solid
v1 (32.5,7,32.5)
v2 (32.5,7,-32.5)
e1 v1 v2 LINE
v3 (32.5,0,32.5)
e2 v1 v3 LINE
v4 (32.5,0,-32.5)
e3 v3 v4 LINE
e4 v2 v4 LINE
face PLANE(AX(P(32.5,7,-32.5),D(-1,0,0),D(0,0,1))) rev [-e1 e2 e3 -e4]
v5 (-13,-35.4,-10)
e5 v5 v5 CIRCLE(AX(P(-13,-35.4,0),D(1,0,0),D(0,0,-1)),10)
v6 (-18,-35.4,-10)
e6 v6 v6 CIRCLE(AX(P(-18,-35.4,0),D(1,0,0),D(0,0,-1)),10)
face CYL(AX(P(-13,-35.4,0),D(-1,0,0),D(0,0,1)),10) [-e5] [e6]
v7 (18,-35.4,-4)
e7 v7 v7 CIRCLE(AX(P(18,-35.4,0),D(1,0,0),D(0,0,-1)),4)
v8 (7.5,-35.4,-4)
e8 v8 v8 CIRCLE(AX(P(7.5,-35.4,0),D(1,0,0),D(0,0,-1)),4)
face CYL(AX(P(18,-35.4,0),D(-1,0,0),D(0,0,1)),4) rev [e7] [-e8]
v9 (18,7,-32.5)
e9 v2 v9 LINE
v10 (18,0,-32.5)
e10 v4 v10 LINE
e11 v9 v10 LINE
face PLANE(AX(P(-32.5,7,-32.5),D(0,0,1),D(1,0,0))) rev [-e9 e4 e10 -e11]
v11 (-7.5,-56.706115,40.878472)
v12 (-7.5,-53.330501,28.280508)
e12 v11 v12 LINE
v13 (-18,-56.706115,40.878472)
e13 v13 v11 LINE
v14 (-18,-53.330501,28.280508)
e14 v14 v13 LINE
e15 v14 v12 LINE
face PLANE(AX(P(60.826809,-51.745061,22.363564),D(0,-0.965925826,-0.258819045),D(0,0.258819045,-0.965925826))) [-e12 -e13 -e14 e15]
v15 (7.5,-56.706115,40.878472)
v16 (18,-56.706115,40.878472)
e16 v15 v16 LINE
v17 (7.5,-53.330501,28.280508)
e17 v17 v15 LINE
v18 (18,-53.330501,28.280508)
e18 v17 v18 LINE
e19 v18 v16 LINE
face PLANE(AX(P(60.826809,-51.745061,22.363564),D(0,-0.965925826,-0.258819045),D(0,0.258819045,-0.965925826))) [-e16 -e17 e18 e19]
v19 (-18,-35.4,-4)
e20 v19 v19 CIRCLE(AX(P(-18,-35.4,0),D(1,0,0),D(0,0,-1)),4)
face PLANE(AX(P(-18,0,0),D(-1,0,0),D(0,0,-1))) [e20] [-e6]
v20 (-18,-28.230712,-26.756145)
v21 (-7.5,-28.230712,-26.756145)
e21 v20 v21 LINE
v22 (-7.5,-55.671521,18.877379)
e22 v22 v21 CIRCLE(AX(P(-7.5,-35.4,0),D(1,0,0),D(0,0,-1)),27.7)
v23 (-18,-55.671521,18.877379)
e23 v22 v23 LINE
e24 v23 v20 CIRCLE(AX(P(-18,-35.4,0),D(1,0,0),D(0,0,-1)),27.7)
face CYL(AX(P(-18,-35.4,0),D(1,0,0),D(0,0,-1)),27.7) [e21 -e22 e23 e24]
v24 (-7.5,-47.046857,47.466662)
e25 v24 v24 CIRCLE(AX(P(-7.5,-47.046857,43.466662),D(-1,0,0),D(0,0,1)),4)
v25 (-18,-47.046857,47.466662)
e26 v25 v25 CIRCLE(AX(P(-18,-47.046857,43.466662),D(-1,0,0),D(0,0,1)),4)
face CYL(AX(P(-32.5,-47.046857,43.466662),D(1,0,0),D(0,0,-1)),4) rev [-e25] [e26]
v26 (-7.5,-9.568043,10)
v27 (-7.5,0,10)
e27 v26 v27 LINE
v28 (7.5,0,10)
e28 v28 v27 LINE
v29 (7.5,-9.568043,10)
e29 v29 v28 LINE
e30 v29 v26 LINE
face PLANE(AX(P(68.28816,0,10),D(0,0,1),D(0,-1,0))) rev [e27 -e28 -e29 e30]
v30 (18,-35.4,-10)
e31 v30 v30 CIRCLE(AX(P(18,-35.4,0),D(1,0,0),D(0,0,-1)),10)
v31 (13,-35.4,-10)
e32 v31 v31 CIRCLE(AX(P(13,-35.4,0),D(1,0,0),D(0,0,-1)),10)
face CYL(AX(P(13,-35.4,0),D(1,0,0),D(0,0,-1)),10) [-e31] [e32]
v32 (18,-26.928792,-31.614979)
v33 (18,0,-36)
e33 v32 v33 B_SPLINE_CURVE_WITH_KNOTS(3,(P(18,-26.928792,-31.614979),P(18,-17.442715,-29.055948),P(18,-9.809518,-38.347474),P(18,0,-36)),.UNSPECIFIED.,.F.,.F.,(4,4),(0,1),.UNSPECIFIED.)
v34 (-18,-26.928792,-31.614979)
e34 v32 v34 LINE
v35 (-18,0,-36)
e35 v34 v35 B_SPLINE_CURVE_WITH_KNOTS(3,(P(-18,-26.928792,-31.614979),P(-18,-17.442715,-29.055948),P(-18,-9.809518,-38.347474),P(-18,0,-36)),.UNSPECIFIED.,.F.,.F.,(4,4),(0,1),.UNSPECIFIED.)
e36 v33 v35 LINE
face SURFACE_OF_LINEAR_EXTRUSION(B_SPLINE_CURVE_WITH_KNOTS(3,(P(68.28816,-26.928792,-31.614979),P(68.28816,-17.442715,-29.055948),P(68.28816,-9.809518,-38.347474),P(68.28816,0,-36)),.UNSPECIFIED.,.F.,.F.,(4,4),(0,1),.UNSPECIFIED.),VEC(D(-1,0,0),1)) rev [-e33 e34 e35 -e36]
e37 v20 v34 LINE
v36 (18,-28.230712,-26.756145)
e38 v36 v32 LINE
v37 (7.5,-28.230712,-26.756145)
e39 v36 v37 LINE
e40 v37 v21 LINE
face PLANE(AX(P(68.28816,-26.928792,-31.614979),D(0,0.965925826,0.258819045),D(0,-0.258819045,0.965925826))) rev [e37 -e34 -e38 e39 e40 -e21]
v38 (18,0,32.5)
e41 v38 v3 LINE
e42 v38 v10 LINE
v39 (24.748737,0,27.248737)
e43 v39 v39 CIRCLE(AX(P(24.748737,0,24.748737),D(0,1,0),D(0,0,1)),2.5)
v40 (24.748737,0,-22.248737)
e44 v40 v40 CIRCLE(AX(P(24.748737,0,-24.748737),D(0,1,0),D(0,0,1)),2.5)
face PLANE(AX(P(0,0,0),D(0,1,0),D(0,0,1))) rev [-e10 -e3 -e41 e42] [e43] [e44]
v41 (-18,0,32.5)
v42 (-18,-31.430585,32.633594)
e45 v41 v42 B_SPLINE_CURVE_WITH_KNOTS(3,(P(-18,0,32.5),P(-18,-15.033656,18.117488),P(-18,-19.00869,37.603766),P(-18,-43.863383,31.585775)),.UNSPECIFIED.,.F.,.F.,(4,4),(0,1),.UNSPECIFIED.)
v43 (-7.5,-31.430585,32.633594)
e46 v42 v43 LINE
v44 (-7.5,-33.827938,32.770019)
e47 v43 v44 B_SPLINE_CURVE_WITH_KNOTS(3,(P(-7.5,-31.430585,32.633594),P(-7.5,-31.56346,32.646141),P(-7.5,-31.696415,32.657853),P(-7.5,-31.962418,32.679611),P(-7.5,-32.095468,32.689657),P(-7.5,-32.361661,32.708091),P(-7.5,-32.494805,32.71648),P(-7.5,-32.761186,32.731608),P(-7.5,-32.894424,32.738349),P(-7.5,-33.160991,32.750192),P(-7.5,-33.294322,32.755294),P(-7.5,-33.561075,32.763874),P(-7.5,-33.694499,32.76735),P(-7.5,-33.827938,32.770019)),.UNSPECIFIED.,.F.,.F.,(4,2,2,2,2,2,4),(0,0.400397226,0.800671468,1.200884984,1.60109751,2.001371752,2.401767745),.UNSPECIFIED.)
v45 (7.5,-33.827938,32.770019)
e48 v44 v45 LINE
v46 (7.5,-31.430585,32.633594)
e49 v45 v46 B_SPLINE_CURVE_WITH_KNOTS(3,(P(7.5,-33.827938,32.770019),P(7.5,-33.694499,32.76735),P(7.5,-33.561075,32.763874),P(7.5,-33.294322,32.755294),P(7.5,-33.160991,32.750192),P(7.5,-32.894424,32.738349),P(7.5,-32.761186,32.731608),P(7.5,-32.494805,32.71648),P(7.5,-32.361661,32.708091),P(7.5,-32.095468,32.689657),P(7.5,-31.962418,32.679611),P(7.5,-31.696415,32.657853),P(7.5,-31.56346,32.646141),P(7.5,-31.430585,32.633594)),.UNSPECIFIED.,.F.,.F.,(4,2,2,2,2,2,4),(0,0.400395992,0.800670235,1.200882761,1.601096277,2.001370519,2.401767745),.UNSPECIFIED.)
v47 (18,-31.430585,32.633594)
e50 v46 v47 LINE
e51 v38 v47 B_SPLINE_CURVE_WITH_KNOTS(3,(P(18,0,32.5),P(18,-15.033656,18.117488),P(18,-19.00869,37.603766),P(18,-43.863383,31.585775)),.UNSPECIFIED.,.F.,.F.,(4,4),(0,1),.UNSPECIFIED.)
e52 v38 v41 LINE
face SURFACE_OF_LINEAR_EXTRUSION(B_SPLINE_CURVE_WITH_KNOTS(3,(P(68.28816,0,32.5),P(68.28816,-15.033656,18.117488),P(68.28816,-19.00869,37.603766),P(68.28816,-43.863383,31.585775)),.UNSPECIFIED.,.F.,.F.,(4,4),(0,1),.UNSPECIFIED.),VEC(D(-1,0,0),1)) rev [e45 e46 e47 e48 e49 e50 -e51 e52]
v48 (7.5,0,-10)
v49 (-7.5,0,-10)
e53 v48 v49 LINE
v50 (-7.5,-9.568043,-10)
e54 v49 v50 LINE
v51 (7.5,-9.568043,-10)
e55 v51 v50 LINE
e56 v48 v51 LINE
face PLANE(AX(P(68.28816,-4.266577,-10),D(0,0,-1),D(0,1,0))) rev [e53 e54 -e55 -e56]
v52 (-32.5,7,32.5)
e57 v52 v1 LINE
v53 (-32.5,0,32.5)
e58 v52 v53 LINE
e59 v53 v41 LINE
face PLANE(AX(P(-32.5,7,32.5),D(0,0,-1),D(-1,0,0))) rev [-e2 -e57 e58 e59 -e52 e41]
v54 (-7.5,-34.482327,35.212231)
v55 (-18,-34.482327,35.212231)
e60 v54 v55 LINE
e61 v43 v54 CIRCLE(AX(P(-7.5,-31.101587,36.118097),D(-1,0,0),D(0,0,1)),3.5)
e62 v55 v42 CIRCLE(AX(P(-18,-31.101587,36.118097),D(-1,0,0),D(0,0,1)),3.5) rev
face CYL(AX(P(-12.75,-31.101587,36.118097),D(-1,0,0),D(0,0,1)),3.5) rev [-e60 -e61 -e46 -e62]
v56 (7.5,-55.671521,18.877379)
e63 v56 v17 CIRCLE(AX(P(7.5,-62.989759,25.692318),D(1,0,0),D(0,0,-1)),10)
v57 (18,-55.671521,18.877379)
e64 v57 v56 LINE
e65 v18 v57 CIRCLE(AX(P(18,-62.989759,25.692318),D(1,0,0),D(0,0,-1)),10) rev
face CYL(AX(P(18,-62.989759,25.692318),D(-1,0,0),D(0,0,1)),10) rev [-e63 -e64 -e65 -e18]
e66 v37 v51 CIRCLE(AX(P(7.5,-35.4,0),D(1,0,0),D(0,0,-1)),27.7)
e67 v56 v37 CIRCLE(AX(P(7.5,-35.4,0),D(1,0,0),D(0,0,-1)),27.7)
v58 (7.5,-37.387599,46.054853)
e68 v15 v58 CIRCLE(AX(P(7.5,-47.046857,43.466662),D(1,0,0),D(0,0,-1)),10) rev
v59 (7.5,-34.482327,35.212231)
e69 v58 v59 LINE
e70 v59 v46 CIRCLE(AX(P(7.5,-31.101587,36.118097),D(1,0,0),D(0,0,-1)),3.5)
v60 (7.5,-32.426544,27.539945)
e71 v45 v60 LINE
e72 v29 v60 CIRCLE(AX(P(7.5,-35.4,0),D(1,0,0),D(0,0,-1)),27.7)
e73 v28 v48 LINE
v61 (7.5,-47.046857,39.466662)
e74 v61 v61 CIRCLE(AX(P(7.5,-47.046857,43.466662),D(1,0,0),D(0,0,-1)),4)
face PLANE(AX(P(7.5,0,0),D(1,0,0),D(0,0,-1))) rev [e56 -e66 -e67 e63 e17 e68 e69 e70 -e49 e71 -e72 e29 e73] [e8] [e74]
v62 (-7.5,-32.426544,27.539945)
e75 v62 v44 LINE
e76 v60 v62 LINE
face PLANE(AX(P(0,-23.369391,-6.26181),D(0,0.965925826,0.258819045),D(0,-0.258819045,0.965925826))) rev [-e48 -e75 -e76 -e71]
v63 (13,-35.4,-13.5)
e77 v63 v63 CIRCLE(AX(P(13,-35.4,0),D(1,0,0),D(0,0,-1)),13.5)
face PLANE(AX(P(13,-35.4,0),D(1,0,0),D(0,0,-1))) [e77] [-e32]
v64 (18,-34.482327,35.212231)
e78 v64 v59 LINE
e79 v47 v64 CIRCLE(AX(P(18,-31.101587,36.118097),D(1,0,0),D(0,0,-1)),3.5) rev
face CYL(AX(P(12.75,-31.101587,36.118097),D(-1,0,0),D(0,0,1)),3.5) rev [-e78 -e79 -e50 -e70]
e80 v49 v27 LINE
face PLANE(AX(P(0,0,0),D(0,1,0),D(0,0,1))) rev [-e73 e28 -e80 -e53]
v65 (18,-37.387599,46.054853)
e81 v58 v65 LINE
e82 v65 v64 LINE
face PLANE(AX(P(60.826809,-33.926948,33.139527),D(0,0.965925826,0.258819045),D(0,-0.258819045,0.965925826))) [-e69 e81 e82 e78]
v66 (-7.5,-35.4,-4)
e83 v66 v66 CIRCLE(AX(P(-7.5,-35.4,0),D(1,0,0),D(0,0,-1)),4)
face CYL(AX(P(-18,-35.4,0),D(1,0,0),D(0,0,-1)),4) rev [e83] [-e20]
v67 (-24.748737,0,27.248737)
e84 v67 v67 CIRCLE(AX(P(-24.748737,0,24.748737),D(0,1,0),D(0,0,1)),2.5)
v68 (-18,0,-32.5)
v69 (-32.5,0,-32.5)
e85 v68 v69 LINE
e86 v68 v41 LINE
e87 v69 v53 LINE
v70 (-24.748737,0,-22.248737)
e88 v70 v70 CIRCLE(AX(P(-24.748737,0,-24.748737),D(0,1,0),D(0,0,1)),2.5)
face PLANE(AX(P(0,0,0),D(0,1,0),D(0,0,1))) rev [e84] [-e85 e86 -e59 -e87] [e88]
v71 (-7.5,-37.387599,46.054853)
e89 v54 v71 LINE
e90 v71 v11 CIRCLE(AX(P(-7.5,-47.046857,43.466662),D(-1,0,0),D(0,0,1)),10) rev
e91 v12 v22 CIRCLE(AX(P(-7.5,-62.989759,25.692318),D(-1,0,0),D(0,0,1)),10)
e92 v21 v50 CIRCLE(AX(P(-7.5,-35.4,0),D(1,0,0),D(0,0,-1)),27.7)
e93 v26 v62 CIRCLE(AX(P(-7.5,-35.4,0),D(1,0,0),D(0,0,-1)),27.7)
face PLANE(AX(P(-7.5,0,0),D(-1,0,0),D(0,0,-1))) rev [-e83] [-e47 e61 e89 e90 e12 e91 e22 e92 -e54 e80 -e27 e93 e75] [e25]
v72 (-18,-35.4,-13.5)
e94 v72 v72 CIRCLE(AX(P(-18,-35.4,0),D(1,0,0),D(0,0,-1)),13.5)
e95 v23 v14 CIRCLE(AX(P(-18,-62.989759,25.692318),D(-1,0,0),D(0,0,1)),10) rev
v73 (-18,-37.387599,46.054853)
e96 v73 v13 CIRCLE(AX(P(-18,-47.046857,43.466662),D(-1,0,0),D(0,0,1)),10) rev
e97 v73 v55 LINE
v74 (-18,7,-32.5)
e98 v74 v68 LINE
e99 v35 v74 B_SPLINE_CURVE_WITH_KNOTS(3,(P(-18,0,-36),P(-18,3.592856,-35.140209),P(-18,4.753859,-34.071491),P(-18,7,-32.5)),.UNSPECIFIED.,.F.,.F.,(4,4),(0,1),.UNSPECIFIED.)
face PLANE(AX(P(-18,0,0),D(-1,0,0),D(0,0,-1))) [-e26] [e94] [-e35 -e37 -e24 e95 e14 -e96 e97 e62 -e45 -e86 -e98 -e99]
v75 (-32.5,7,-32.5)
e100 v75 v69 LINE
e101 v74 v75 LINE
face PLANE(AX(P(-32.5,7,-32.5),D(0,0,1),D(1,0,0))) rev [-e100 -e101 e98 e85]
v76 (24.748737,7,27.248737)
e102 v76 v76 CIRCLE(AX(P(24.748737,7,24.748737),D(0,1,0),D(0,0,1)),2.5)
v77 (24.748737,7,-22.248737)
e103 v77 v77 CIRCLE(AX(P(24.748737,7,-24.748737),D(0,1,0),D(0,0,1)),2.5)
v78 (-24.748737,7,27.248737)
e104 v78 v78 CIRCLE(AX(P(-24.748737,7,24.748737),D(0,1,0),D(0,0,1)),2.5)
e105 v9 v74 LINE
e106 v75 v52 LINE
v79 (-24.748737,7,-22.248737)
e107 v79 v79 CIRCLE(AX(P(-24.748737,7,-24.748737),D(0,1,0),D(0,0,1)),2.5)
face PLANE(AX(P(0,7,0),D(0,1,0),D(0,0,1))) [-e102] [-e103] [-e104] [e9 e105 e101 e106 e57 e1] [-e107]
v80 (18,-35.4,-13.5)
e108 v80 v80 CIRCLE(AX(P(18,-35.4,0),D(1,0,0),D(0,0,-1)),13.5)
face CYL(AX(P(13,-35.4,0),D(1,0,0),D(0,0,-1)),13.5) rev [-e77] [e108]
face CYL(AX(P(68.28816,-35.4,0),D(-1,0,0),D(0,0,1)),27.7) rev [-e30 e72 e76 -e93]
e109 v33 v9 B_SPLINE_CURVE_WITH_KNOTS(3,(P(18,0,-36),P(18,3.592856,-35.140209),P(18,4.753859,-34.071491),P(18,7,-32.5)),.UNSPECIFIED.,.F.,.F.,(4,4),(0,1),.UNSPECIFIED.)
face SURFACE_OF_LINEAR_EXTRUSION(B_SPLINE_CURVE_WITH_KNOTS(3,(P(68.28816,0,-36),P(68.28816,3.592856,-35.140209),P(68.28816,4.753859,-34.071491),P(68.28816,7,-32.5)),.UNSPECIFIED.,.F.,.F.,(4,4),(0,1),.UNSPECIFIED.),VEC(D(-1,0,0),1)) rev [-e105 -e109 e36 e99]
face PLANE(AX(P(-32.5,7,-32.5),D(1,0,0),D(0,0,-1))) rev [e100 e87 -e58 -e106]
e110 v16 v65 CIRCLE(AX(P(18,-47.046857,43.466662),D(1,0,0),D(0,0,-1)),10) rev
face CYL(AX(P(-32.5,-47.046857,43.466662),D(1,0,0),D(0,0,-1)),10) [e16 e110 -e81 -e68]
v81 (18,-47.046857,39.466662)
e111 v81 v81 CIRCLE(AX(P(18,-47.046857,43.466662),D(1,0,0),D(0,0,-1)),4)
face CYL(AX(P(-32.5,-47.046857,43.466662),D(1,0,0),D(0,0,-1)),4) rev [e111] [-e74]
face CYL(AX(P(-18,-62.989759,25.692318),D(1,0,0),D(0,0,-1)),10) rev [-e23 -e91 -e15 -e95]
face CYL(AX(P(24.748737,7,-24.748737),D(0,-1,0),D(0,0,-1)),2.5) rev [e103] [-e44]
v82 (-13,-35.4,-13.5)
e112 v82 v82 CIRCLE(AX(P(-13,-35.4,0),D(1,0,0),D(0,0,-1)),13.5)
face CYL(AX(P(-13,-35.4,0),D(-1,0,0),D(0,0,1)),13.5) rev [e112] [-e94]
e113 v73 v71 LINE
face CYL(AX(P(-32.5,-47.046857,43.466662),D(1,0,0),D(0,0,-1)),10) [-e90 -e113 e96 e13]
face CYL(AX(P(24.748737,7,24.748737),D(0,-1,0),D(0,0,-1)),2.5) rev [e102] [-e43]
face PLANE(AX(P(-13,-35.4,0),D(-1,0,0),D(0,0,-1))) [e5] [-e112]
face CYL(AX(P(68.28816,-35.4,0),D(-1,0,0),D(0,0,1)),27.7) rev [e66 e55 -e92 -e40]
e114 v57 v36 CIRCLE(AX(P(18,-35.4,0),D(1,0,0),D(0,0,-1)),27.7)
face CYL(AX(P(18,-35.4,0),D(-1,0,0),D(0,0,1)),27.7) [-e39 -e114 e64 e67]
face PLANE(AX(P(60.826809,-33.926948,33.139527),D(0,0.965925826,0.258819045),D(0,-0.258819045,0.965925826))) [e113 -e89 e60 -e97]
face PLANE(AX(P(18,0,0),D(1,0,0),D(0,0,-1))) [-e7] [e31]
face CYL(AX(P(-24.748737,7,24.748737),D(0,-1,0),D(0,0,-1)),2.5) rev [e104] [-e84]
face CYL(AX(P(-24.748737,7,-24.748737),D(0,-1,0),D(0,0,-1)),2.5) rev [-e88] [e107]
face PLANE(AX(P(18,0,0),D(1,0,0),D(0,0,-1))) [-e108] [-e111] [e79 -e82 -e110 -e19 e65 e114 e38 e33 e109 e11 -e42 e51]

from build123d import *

# Parameters (mm, degrees)
SKETCH1_W                       = 65
SKETCH1_H                       = 65
SKETCH1_R                       = 2.5
BOSS_EXTRUDE1_DEPTH             = 7
BOSS_EXTRUDE2_START             = 7.5
SKETCH2_R                       = 4
BOSS_EXTRUDE2_DEPTH             = 10.5
BOSS_EXTRUDE3_REACH             = 80.065
BOSS_EXTRUDE3_DIRECTION_2_REACH = 80.065
BOSS_EXTRUDE7_START             = -18
BOSS_EXTRUDE7_DEPTH             = 36
SKETCH6_W                       = 15
SKETCH6_H                       = 30
CUT_EXTRUDE1_DEPTH              = 81.472268493
SKETCH8_R                       = 13.5
SKETCH8_R_2                     = 10
CUT_EXTRUDE3_DEPTH              = 5
CUT_EXTRUDE4_DEPTH              = 91.23260041
CUT_EXTRUDE4_DEPTH_BACK         = 91.23260041
SKETCH7_R                       = 4
FILLET16_R                      = 3.5
FILLET17_R                      = 3.5
FILLET19_R                      = 10


with BuildPart() as part:
    # Sketch1 → Boss-Extrude1 (new body)
    with BuildSketch(Plane(origin=(0, 0, 0), x_dir=(1, 0, 0), z_dir=(0, 1, 0))):
        Rectangle(SKETCH1_W, SKETCH1_H)
        with Locations(Location((-24.748737342, 24.748737342, 0), (0, 0, 270))):
            Circle(SKETCH1_R, mode=Mode.SUBTRACT)
        with Locations(Location((24.748737342, 24.748737342, 0), (0, 0, 270))):
            Circle(SKETCH1_R, mode=Mode.SUBTRACT)
        with Locations(Location((24.748737342, -24.748737342, 0), (0, 0, 270))):
            Circle(SKETCH1_R, mode=Mode.SUBTRACT)
        with Locations(Location((-24.748737342, -24.748737342, 0), (0, 0, 270))):
            Circle(SKETCH1_R, mode=Mode.SUBTRACT)
    extrude(amount=BOSS_EXTRUDE1_DEPTH)

    # Sketch2 → Boss-Extrude2 (add)
    with BuildSketch(Plane(origin=(0, 0, 0), x_dir=(0, 0, -1), z_dir=(1, 0, 0)).offset(BOSS_EXTRUDE2_START)):
        with BuildLine():
            Line((10, -9.568043047), (10, 1.517986249))
            Line((10, 1.517986249), (-10, 1.517986249))
            Line((-10, 1.517986249), (-10, -9.568043047))
            ThreePointArc((-10, -9.568043047), (0, -63.1), (10, -9.568043047))
        make_face()
        with Locations((0, -35.4)):
            Circle(SKETCH2_R, mode=Mode.SUBTRACT)
    boss_extrude2 = extrude(amount=BOSS_EXTRUDE2_DEPTH)

    # Mirror1: Boss-Extrude2 across plane
    add(boss_extrude2.mirror(Plane(origin=(0, 0, 0), x_dir=(0, 0, 1), z_dir=(1, 0, 0))))

    # Boss-Extrude3: up to this face of the body (flat: up to its plane)
    boss_extrude3_end = Plane(part.part.faces().sort_by_distance((18, -62.260311367, 0))[0])
    # Sketch3 → Boss-Extrude3 (add, up to the picked face)
    with BuildSketch(Plane(origin=(0, 0, 0), x_dir=(0, 0, -1), z_dir=(1, 0, 0)), mode=Mode.PRIVATE) as boss_extrude3_sk1:
        with BuildLine():
            Line((32.5, 0), (10, 0))
            Line((10, 0), (10, -4.266577445))
            Line((10, -4.266577445), (10, -9.568043047))
            ThreePointArc((10, -9.568043047), (20.611340647, -16.894253954), (26.756145388, -28.230712451))
            Line((26.756145388, -28.230712451), (31.61497925, -26.928791841))
            add(Edge.make_bspline(
                [(31.61497925, -26.928791841), (29.055948241, -17.442715383), (38.347474054, -9.80951762), (36, 0)],
                knots=[0, 0, 0, 0, 1, 1, 1, 1], degree=3))
            add(Edge.make_bspline(
                [(36, 0), (35.140208775, 3.592856394), (34.071491306, 4.753858958), (32.5, 7)],
                knots=[0, 0, 0, 0, 1, 1, 1, 1], degree=3))
            Line((32.5, 7), (32.5, 0))
        make_face()
    boss_extrude3_tool1 = split(extrude(boss_extrude3_sk1.sketch, amount=BOSS_EXTRUDE3_REACH, mode=Mode.PRIVATE), bisect_by=boss_extrude3_end, keep=Keep.BOTH, mode=Mode.PRIVATE)
    # Sketch3 → Boss-Extrude3 (add, up to the picked face)
    with BuildSketch(Plane(origin=(0, 0, 0), x_dir=(0, 0, -1), z_dir=(1, 0, 0)), mode=Mode.PRIVATE) as boss_extrude3_sk2:
        with BuildLine():
            Line((-32.5, 0), (-10, 0))
            Line((-10, 0), (-10, -9.568043047))
            ThreePointArc((-10, -9.568043047), (-24.698665766, -22.859429463), (-26.756145388, -42.569287549))
            Line((-26.756145388, -42.569287549), (-31.58577452, -43.863382775))
            add(Edge.make_bspline(
                [(-31.58577452, -43.863382775), (-37.603765688, -19.008690412), (-18.117487997, -15.033656142), (-32.5, 0)],
                knots=[0, 0, 0, 0, 1, 1, 1, 1], degree=3))
        make_face()
    boss_extrude3_tool2 = split(extrude(boss_extrude3_sk2.sketch, amount=BOSS_EXTRUDE3_REACH, mode=Mode.PRIVATE), bisect_by=boss_extrude3_end, keep=Keep.BOTH, mode=Mode.PRIVATE)
    add(boss_extrude3_tool1.solids().sort_by(Axis((0, -9.525708, -24.617363), (1, 0, 0)))[0])
    add(boss_extrude3_tool2.solids().sort_by(Axis((0, -14.994615, 23.210716), (1, 0, 0)))[0])

    # Boss-Extrude3 direction 2: up to this face of the body (flat: up to its plane)
    boss_extrude3_direction_2_end = Plane(part.part.faces().sort_by_distance((-18, -62.260311367, 0))[0])
    # Sketch3 → Boss-Extrude3 direction 2 (add, up to the picked face)
    with BuildSketch(Plane(origin=(0, 0, 0), x_dir=(0, 0, -1), z_dir=(1, 0, 0)), mode=Mode.PRIVATE) as boss_extrude3_direction_2_sk1:
        with BuildLine():
            Line((32.5, 0), (10, 0))
            Line((10, 0), (10, -4.266577445))
            Line((10, -4.266577445), (10, -9.568043047))
            ThreePointArc((10, -9.568043047), (20.611340647, -16.894253954), (26.756145388, -28.230712451))
            Line((26.756145388, -28.230712451), (31.61497925, -26.928791841))
            add(Edge.make_bspline(
                [(31.61497925, -26.928791841), (29.055948241, -17.442715383), (38.347474054, -9.80951762), (36, 0)],
                knots=[0, 0, 0, 0, 1, 1, 1, 1], degree=3))
            add(Edge.make_bspline(
                [(36, 0), (35.140208775, 3.592856394), (34.071491306, 4.753858958), (32.5, 7)],
                knots=[0, 0, 0, 0, 1, 1, 1, 1], degree=3))
            Line((32.5, 7), (32.5, 0))
        make_face()
    boss_extrude3_direction_2_tool1 = split(extrude(boss_extrude3_direction_2_sk1.sketch, amount=-BOSS_EXTRUDE3_DIRECTION_2_REACH, mode=Mode.PRIVATE), bisect_by=boss_extrude3_direction_2_end, keep=Keep.BOTH, mode=Mode.PRIVATE)
    # Sketch3 → Boss-Extrude3 direction 2 (add, up to the picked face)
    with BuildSketch(Plane(origin=(0, 0, 0), x_dir=(0, 0, -1), z_dir=(1, 0, 0)), mode=Mode.PRIVATE) as boss_extrude3_direction_2_sk2:
        with BuildLine():
            Line((-32.5, 0), (-10, 0))
            Line((-10, 0), (-10, -9.568043047))
            ThreePointArc((-10, -9.568043047), (-24.698665766, -22.859429463), (-26.756145388, -42.569287549))
            Line((-26.756145388, -42.569287549), (-31.58577452, -43.863382775))
            add(Edge.make_bspline(
                [(-31.58577452, -43.863382775), (-37.603765688, -19.008690412), (-18.117487997, -15.033656142), (-32.5, 0)],
                knots=[0, 0, 0, 0, 1, 1, 1, 1], degree=3))
        make_face()
    boss_extrude3_direction_2_tool2 = split(extrude(boss_extrude3_direction_2_sk2.sketch, amount=-BOSS_EXTRUDE3_DIRECTION_2_REACH, mode=Mode.PRIVATE), bisect_by=boss_extrude3_direction_2_end, keep=Keep.BOTH, mode=Mode.PRIVATE)
    add(boss_extrude3_direction_2_tool1.solids().sort_by(Axis((0, -9.525708, -24.617363), (-1, 0, 0)))[0])
    add(boss_extrude3_direction_2_tool2.solids().sort_by(Axis((0, -14.994615, 23.210716), (-1, 0, 0)))[0])

    # Sketch4 → Boss-Extrude7 (add)
    with BuildSketch(Plane(origin=(0, 0, 0), x_dir=(0, 0, -1), z_dir=(1, 0, 0)).offset(BOSS_EXTRUDE7_START)):
        with BuildLine():
            Line((-27.539944815, -32.426544169), (-33.139527425, -33.926947807))
            Line((-33.139527425, -33.926947807), (-55.714110897, -39.975789218))
            Line((-55.714110897, -39.975789218), (-50.537729995, -59.294305744))
            Line((-50.537729995, -59.294305744), (-22.363563913, -51.745060694))
            ThreePointArc((-22.363563913, -51.745060694), (-26.756145388, -42.569287549), (-27.539944815, -32.426544169))
        make_face()
    extrude(amount=BOSS_EXTRUDE7_DEPTH)

    # Sketch6 → Cut-Extrude1 (cut, through all)
    with BuildSketch(Plane(origin=(0, -23.369391384, -6.261809549), x_dir=(1, 0, 0), z_dir=(0, 0.9659258262890686, 0.2588190451025195))):
        with Locations((0, -49.162194197)):
            Rectangle(SKETCH6_W, SKETCH6_H)
    extrude(amount=-CUT_EXTRUDE1_DEPTH, mode=Mode.SUBTRACT)

    # Sketch8 → Cut-Extrude3 (cut)
    with BuildSketch(Plane(origin=(18, 0, 0), x_dir=(0, 0, -1), z_dir=(1, 0, 0))):
        with Locations((0, -35.4)):
            Circle(SKETCH8_R)
        with Locations((0, -35.4)):
            Circle(SKETCH8_R_2, mode=Mode.SUBTRACT)
    cut_extrude3 = extrude(amount=-CUT_EXTRUDE3_DEPTH, mode=Mode.SUBTRACT)

    # Mirror2: Cut-Extrude3 across plane
    add(cut_extrude3.mirror(Plane(origin=(0, 0, 0), x_dir=(0, 0, 1), z_dir=(1, 0, 0))), mode=Mode.SUBTRACT)

    # Sketch7 → Cut-Extrude4 (cut, two sides: drawn at the far end of the back side and taken through both)
    with BuildSketch(Plane(origin=(0, 0, 0), x_dir=(0, 0, -1), z_dir=(1, 0, 0)).offset(-CUT_EXTRUDE4_DEPTH_BACK)):
        with Locations(Location((-43.466662183, -47.04685703, 0), (0, 0, 180))):
            Circle(SKETCH7_R)
        with BuildLine():
            Line((-40.878471732, -56.706115293), (-40.166415946, -59.363543662))
            Line((-40.166415946, -59.363543662), (-53.107989986, -62.831227975))
            Line((-53.107989986, -62.831227975), (-59.564338385, -38.735807717))
            Line((-59.564338385, -38.735807717), (-46.622764346, -35.268123405))
            Line((-46.622764346, -35.268123405), (-46.054852634, -37.387598767))
            ThreePointArc((-46.054852634, -37.387598767), (-53.125920446, -49.635047481), (-40.878471732, -56.706115293))
        make_face()
    extrude(amount=CUT_EXTRUDE4_DEPTH + CUT_EXTRUDE4_DEPTH_BACK, mode=Mode.SUBTRACT)

    # Fillet16
    # the kernel refuses this fillet: 3.5 mm, written as the material it adds along each edge
    with BuildSketch(Plane(origin=(18, -33.827938234, 32.770018668), x_dir=(0, -0.25881904510252074, 0.9659258262890684), z_dir=(-1, 0, 0))) as fillet16_piece_1_section:
        with BuildLine():
            CenterArc((2.528363882, 3.5), FILLET16_R, 200.393732709, 69.606267291)
            Line((-0.752256512, 2.280356677), (-0.81786892, 2.255963811))
            ThreePointArc((-0.81786892, 2.255963811), (-0.421453854, 1.125231743), (-0.06723899, -0.019465823))
            Line((-0.06723899, -0.019465823), (0, -0.07))
            Line((0, -0.07), (2.528363882, -0.07))
            Line((2.528363882, -0.07), (2.528363882, 0))
        make_face()
    fillet16_piece_1 = extrude(amount=10.5, mode=Mode.PRIVATE)
    fillet16_piece_1 = split(fillet16_piece_1, bisect_by=Plane(origin=(12.75, -33.904495307, 33.055733556), z_dir=(0, 0.9659258262890686, 0.2588190451025195)), keep=Keep.TOP, mode=Mode.PRIVATE)
    add(fillet16_piece_1)

    # Fillet17
    # the kernel refuses this fillet: 3.5 mm, written as the material it adds along each edge
    with BuildSketch(Plane(origin=(-18, -33.827938234, 32.770018668), x_dir=(0, -0.25881904510252074, 0.9659258262890684), z_dir=(1, 0, 0))) as fillet17_piece_1_section:
        with BuildLine():
            CenterArc((2.528363882, -3.5), FILLET17_R, 90, 69.606267291)
            Line((-0.752256512, -2.280356677), (-0.81786892, -2.255963811))
            ThreePointArc((-0.81786892, -2.255963811), (-0.421453854, -1.125231743), (-0.06723899, 0.019465823))
            Line((-0.06723899, 0.019465823), (0, 0.07))
            Line((0, 0.07), (2.528363882, 0.07))
            Line((2.528363882, 0.07), (2.528363882, 0))
        make_face()
    fillet17_piece_1 = extrude(amount=10.5, mode=Mode.PRIVATE)
    fillet17_piece_1 = split(fillet17_piece_1, bisect_by=Plane(origin=(-12.75, -33.904495307, 33.055733556), z_dir=(0, 0.9659258262890686, 0.2588190451025195)), keep=Keep.TOP, mode=Mode.PRIVATE)
    add(fillet17_piece_1)

    # Fillet19
    fillet19_edges = [part.edges().sort_by_distance(p)[0] for p in [
        (12.75, -51.745060694, 22.363563913),
        (-12.75, -51.745060694, 22.363563913),
    ]]
    fillet(fillet19_edges, radius=FILLET19_R)


solid = part.part
